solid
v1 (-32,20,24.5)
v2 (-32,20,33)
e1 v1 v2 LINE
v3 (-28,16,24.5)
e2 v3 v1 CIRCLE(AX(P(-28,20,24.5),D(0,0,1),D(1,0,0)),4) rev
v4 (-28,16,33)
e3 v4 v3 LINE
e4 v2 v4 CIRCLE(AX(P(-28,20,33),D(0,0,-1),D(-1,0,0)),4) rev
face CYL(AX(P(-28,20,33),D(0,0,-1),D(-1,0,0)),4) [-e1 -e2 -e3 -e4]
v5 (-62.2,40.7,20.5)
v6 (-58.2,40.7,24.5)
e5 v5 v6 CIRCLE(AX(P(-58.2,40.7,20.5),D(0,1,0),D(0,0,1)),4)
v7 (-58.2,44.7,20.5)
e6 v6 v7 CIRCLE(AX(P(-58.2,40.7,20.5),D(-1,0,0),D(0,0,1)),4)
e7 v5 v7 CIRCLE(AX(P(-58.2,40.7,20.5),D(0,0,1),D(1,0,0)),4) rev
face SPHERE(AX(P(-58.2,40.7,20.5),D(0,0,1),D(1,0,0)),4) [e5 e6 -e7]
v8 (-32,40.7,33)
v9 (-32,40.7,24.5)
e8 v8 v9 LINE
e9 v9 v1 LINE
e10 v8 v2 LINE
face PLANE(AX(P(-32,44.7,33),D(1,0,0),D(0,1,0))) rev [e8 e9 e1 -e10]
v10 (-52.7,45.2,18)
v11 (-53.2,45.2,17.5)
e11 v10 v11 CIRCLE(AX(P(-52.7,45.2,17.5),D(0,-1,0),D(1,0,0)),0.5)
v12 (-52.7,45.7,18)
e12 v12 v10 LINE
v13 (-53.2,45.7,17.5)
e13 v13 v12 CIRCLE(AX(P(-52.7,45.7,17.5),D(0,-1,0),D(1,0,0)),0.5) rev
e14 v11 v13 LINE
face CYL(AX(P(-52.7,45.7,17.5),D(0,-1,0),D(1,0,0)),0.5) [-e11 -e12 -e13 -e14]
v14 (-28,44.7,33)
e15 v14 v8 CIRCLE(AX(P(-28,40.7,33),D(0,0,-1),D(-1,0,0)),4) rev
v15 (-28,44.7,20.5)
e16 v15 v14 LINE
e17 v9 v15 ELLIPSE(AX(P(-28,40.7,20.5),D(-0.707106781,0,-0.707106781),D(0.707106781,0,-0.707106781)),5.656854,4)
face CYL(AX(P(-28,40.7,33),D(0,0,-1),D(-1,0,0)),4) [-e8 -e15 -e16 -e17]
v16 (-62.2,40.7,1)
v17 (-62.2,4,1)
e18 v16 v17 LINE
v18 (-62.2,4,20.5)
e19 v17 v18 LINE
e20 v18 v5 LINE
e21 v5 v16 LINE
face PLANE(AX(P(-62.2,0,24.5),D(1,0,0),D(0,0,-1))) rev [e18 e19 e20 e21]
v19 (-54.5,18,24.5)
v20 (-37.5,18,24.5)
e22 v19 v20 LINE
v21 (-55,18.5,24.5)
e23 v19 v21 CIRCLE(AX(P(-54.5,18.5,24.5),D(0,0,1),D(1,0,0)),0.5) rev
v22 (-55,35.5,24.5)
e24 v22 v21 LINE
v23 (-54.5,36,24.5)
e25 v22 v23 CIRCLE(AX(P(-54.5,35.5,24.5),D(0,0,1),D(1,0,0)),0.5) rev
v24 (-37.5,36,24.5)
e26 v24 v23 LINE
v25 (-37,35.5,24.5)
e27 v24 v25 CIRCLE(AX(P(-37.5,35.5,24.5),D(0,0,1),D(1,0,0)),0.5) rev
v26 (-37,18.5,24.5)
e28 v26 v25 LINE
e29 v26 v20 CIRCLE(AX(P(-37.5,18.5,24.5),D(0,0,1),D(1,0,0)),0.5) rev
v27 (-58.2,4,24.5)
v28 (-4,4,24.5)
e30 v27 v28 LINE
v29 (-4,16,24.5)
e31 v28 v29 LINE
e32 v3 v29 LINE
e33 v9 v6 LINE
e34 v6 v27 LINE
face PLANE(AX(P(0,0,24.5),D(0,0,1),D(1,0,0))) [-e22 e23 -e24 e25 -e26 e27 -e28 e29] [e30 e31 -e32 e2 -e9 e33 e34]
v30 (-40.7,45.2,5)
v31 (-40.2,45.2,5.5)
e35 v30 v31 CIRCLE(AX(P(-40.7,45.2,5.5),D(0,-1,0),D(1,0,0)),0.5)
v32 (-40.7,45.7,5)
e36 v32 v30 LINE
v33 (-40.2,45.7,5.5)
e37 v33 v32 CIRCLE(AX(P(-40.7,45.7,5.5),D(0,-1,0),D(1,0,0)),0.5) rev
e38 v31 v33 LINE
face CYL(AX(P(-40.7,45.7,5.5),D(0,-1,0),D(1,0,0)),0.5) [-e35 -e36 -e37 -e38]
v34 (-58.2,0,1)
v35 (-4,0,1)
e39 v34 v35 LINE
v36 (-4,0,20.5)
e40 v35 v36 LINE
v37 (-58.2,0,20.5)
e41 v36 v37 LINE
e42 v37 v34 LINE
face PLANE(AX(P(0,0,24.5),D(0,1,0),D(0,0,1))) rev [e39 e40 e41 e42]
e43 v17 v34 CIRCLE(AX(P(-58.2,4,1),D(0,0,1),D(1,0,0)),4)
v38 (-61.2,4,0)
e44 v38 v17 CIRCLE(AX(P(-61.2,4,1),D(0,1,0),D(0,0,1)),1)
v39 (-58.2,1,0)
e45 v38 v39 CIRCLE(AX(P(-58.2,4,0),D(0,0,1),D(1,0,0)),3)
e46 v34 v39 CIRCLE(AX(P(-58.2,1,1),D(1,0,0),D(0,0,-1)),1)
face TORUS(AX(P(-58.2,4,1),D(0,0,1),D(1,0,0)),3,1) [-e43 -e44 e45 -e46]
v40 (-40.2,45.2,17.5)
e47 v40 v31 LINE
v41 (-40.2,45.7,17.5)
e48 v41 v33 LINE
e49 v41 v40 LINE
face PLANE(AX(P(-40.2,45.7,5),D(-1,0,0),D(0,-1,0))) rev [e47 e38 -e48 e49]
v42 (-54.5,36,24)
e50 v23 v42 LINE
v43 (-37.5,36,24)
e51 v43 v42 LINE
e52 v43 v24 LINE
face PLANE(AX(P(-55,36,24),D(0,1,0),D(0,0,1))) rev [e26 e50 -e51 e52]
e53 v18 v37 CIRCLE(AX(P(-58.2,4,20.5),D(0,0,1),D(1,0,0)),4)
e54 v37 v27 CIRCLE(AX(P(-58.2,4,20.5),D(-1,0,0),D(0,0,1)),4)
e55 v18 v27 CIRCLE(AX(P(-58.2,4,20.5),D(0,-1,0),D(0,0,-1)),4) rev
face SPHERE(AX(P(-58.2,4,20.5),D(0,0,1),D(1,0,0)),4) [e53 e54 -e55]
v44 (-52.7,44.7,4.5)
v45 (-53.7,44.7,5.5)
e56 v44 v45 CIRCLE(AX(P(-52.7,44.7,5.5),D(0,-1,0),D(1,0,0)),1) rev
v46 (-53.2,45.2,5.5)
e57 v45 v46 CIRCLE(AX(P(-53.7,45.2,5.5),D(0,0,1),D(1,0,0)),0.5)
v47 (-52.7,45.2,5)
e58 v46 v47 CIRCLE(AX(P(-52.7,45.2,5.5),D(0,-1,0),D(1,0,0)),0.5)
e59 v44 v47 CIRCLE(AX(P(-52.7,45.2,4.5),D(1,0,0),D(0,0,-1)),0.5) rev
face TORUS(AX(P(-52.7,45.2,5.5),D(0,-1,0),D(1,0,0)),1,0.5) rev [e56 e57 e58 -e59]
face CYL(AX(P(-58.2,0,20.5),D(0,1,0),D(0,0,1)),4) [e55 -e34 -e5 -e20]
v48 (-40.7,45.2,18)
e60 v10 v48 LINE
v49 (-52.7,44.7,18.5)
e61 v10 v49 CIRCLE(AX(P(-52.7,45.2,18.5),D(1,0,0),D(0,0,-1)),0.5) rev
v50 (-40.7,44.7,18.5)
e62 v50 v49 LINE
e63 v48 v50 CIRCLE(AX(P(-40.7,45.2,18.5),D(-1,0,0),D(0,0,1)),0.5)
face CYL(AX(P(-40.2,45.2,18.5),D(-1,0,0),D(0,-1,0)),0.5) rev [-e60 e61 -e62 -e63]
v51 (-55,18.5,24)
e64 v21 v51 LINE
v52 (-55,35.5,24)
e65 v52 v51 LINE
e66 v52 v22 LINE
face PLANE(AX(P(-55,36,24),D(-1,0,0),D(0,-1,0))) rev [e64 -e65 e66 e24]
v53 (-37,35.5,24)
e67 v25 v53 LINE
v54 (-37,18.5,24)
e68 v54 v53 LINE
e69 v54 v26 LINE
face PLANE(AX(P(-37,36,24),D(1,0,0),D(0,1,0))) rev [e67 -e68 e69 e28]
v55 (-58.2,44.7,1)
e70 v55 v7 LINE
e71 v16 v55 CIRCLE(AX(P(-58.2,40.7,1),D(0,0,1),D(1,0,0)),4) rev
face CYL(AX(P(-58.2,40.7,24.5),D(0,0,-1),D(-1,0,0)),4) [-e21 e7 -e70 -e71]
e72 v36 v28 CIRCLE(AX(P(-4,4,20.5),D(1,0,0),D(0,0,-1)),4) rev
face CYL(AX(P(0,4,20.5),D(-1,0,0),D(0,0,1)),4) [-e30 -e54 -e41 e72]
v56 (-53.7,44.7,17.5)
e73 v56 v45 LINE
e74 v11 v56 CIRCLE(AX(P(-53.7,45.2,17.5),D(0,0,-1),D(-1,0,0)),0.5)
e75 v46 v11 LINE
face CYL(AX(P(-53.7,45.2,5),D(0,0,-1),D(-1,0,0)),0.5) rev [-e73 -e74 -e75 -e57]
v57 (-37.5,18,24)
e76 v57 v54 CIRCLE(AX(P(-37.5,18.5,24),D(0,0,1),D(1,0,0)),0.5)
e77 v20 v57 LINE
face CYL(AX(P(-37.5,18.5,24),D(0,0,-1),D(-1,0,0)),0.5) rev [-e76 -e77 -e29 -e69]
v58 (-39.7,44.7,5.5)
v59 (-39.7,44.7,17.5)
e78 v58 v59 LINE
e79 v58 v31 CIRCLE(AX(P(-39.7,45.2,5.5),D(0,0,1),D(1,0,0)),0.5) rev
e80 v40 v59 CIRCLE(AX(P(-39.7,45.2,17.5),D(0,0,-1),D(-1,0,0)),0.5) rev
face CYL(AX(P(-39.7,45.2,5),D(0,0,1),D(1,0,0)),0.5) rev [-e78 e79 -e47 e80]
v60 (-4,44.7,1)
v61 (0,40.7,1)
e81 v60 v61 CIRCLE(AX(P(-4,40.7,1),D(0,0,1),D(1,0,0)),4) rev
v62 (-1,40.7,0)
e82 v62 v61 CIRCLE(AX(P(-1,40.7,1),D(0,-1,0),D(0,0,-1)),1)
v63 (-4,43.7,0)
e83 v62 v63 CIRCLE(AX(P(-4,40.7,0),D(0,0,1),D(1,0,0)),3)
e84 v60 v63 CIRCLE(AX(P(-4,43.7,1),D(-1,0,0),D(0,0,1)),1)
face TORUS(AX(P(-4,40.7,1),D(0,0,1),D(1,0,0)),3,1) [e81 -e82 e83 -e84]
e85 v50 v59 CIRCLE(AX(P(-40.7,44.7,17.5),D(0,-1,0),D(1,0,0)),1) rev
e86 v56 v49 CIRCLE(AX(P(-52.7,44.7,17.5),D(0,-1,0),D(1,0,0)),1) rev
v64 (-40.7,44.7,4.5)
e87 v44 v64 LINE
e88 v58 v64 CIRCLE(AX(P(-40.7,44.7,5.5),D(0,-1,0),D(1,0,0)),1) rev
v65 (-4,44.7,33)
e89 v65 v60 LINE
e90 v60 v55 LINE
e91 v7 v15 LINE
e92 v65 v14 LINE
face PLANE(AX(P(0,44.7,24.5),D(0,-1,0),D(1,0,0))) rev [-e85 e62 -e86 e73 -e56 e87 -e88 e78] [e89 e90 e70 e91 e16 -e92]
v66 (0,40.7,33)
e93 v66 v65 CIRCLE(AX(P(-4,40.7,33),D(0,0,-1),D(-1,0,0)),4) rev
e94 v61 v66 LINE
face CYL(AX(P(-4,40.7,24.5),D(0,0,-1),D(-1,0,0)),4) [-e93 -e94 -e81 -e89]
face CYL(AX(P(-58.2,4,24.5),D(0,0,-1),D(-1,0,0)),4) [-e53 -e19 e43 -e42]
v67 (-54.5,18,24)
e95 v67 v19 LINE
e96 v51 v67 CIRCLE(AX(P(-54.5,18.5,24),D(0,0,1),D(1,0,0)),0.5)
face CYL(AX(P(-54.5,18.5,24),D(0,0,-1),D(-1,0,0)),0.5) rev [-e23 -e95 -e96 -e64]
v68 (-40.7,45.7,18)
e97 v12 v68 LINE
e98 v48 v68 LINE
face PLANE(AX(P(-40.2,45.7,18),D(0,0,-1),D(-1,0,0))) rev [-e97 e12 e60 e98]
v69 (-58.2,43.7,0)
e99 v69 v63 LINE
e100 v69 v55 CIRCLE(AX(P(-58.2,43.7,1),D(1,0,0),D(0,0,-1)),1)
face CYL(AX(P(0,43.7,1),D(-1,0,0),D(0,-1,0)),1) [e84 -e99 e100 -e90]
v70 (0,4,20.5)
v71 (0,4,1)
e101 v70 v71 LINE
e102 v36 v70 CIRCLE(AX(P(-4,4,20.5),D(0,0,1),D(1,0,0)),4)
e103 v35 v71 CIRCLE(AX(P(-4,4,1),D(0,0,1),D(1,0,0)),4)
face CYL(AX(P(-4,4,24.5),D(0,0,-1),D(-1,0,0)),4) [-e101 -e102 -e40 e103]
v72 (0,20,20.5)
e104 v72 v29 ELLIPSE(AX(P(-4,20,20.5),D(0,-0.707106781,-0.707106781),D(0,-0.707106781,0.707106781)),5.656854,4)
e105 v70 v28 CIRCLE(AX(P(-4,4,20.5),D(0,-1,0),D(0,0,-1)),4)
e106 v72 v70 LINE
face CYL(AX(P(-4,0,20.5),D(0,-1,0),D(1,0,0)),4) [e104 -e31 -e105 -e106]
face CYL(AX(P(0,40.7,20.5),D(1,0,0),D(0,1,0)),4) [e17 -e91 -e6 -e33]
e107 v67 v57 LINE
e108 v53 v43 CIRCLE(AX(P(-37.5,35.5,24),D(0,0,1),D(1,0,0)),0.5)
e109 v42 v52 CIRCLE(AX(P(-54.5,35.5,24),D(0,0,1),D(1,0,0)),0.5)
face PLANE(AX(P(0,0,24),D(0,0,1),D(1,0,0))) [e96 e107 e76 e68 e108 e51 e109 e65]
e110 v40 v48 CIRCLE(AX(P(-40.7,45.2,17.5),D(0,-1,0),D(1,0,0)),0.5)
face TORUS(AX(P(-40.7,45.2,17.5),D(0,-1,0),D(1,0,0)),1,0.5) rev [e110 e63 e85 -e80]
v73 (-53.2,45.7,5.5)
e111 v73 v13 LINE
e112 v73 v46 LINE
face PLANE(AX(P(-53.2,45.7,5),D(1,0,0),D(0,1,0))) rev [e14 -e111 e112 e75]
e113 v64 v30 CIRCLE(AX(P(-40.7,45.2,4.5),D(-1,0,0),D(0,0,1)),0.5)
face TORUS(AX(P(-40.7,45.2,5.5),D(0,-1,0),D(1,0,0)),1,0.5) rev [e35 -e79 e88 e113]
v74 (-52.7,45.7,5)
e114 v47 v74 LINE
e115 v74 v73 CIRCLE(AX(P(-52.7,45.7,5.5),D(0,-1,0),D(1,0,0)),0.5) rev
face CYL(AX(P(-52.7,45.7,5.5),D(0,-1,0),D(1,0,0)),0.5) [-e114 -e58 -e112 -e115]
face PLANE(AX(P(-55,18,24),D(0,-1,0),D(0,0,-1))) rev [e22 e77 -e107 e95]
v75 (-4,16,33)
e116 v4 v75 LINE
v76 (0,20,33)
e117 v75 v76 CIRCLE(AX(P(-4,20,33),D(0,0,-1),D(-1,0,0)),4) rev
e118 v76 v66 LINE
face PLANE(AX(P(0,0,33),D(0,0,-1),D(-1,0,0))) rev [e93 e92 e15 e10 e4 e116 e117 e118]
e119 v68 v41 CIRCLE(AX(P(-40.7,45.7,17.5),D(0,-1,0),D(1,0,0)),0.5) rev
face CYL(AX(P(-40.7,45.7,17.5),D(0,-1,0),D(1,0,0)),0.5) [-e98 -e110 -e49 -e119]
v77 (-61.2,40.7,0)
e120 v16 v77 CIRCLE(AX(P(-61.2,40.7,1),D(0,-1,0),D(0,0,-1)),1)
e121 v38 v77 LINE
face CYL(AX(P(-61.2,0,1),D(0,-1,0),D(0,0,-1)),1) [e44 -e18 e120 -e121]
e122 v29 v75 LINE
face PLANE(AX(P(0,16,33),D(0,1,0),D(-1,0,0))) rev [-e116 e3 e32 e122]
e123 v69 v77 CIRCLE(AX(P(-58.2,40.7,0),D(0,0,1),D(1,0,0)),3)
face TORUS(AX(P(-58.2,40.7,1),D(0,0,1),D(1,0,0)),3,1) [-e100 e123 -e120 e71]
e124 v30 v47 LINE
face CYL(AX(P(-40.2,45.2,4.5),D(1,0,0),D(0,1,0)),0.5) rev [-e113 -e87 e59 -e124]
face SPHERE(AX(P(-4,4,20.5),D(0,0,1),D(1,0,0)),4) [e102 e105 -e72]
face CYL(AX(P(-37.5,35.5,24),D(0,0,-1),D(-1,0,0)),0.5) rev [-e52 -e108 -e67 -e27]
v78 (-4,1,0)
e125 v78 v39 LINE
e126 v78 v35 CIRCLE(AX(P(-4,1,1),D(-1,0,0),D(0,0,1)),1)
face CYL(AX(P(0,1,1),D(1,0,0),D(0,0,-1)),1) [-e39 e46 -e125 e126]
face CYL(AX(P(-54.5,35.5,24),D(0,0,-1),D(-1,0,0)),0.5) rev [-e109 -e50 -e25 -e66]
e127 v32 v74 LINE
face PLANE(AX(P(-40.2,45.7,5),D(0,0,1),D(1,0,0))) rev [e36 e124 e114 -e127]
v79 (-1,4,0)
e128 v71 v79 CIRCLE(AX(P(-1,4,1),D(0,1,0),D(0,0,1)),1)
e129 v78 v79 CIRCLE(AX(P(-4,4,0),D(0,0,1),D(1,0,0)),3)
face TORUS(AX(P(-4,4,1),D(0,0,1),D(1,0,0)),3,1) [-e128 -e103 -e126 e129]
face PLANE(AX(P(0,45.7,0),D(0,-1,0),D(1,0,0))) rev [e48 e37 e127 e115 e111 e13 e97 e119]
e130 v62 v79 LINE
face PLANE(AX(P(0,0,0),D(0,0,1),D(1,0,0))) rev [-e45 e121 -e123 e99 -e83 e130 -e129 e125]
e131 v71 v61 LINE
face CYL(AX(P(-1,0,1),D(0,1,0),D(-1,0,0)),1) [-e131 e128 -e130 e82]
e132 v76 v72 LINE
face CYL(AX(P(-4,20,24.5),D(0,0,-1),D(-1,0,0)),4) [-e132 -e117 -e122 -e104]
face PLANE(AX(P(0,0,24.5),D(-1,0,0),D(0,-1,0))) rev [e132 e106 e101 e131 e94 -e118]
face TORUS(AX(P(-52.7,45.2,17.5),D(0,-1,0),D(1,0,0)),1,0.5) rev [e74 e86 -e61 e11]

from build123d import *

# Parameters (mm, degrees)
CROQUIS1_W              = 62.2
CROQUIS1_H              = 44.7
SALIENTE_EXTRUIR1_DEPTH = 24.5
CROQUIS2_W              = 32
CROQUIS2_H              = 28.7
SALIENTE_EXTRUIR2_DEPTH = 8.5
CROQUIS3_W              = 18
CROQUIS3_H              = 18
CORTAR_EXTRUIR1_DEPTH   = 0.5
CROQUIS4_W              = 13
CROQUIS4_H              = 13
SALIENTE_EXTRUIR3_DEPTH = 1
REDONDEO2_R             = 0.5
REDONDEO3_R             = 1
REDONDEO1_R             = 4


with BuildPart() as part:
    # Croquis1 → Saliente-Extruir1 (new body)
    with BuildSketch(Plane.XY):
        with Locations((-31.1, 22.35)):
            Rectangle(CROQUIS1_W, CROQUIS1_H)
    extrude(amount=SALIENTE_EXTRUIR1_DEPTH)

    # Croquis2 → Saliente-Extruir2 (add)
    with BuildSketch(Plane.XY.offset(24.5)):
        with Locations((-16, 30.35)):
            Rectangle(CROQUIS2_W, CROQUIS2_H)
    extrude(amount=SALIENTE_EXTRUIR2_DEPTH)

    # Croquis3 → Cortar-Extruir1 (cut)
    with BuildSketch(Plane.XY.offset(24.5)):
        with Locations((-46, 27)):
            Rectangle(CROQUIS3_W, CROQUIS3_H)
    extrude(amount=-CORTAR_EXTRUIR1_DEPTH, mode=Mode.SUBTRACT)

    # Croquis4 → Saliente-Extruir3 (add)
    with BuildSketch(Plane(origin=(0, 44.7, 0), x_dir=(1, 0, 0), z_dir=(0, 1, 0))):
        with Locations((-46.7, -11.5)):
            Rectangle(CROQUIS4_W, CROQUIS4_H)
    extrude(amount=SALIENTE_EXTRUIR3_DEPTH)

    # Redondeo2
    redondeo2_edges = [part.edges().sort_by_distance(p)[0] for p in [
        (-55, 18, 24.25),
        (-55, 36, 24.25),
        (-37, 36, 24.25),
        (-37, 18, 24.25),
        (-40.2, 44.7, 11.5),
        (-40.2, 45.2, 18),
        (-46.7, 44.7, 5),
        (-40.2, 45.2, 5),
        (-53.2, 44.7, 11.5),
        (-53.2, 45.2, 5),
        (-46.7, 44.7, 18),
        (-53.2, 45.2, 18),
    ]]
    fillet(redondeo2_edges, radius=REDONDEO2_R)

    # Redondeo3
    redondeo3_edges = [part.edges().sort_by_distance(p)[0] for p in [
        (-31.1, 0, 0),
        (-62.2, 22.35, 0),
        (-31.1, 44.7, 0),
        (0, 22.35, 0),
    ]]
    fillet(redondeo3_edges, radius=REDONDEO3_R)

    # Redondeo1
    # the kernel refuses this fillet: 4 mm, written as the material it takes off along each edge
    with BuildSketch(Plane(origin=(-4, 40.7, 0), x_dir=(0, 1, 0), z_dir=(-1, 0, 0))) as redondeo1_piece_1:
        with BuildLine():
            CenterArc((3, -1), 1, 0, 90)
            Line((4, -1), (4, 0))
            Line((4, 0), (3, 0))
        make_face()
    revolve(axis=Axis((-4, 40.7, 0), (0, 0, -1)), revolution_arc=90, mode=Mode.SUBTRACT)
    with BuildSketch(Plane(origin=(-4, 4, 0), x_dir=(1, 0, 0), z_dir=(0, 1, 0))) as redondeo1_piece_2:
        with BuildLine():
            CenterArc((3, -1), 1, 0, 90)
            Line((4, -1), (4, 0))
            Line((4, 0), (3, 0))
        make_face()
    revolve(axis=Axis((-4, 4, 0), (0, 0, -1)), revolution_arc=90, mode=Mode.SUBTRACT)
    with BuildSketch(Plane(origin=(-58.2, 40.7, 0), x_dir=(-1, 0, 0), z_dir=(0, -1, 0))) as redondeo1_piece_3:
        with BuildLine():
            CenterArc((3, -1), 1, 0, 90)
            Line((4, -1), (4, 0))
            Line((4, 0), (3, 0))
        make_face()
    revolve(axis=Axis((-58.2, 40.7, 0), (0, 0, -1)), revolution_arc=90, mode=Mode.SUBTRACT)
    with BuildSketch(Plane(origin=(-58.2, 4, 0), x_dir=(0, -1, 0), z_dir=(1, 0, 0))) as redondeo1_piece_4:
        with BuildLine():
            CenterArc((3, -1), 1, 0, 90)
            Line((4, -1), (4, 0))
            Line((4, 0), (3, 0))
        make_face()
    revolve(axis=Axis((-58.2, 4, 0), (0, 0, -1)), revolution_arc=90, mode=Mode.SUBTRACT)
    with BuildSketch(Plane(origin=(-58.2, 4, 20.5), x_dir=(0, 0, 1), z_dir=(0, -1, 0))) as redondeo1_piece_5_section:
        Polygon((0, 0), (REDONDEO1_R, 0), (REDONDEO1_R, REDONDEO1_R), (0, REDONDEO1_R), align=None)
    redondeo1_piece_5 = extrude(amount=REDONDEO1_R, mode=Mode.PRIVATE)
    redondeo1_piece_5 = redondeo1_piece_5 - Plane(origin=(-58.2, 4, 20.5), x_dir=(0.7071067811865475, 0, -0.7071067811865475), z_dir=(0, -1, 0)) * Sphere(REDONDEO1_R, mode=Mode.PRIVATE)
    add(redondeo1_piece_5, mode=Mode.SUBTRACT)
    with BuildSketch(Plane(origin=(-58.2, 40.7, 20.5), x_dir=(0, 0, 1), z_dir=(0, 1, 0))) as redondeo1_piece_6_section:
        Polygon((0, 0), (REDONDEO1_R, 0), (REDONDEO1_R, -REDONDEO1_R), (0, -REDONDEO1_R), align=None)
    redondeo1_piece_6 = extrude(amount=REDONDEO1_R, mode=Mode.PRIVATE)
    redondeo1_piece_6 = redondeo1_piece_6 - Plane(origin=(-58.2, 40.7, 20.5), x_dir=(0.7071067811865475, 0, -0.7071067811865475), z_dir=(0, 1, 0)) * Sphere(REDONDEO1_R, mode=Mode.PRIVATE)
    add(redondeo1_piece_6, mode=Mode.SUBTRACT)
    with BuildSketch(Plane(origin=(-4, 4, 20.5), x_dir=(0, -1, 0), z_dir=(1, 0, 0))) as redondeo1_piece_7_section:
        Polygon((0, 0), (REDONDEO1_R, 0), (REDONDEO1_R, -REDONDEO1_R), (0, -REDONDEO1_R), align=None)
    redondeo1_piece_7 = extrude(amount=REDONDEO1_R, mode=Mode.PRIVATE)
    redondeo1_piece_7 = redondeo1_piece_7 - Plane(origin=(-4, 4, 20.5), x_dir=(0, 0.7071067811865475, -0.7071067811865475), z_dir=(1, 0, 0)) * Sphere(REDONDEO1_R, mode=Mode.PRIVATE)
    add(redondeo1_piece_7, mode=Mode.SUBTRACT)
    with BuildSketch(Plane(origin=(-62.2, 4, 24.5), x_dir=(1, 0, 0), z_dir=(0, 1, 0))) as redondeo1_piece_8:
        with BuildLine():
            CenterArc((REDONDEO1_R, REDONDEO1_R), REDONDEO1_R, 180, 90)
            Line((0, REDONDEO1_R), (0, 0))
            Line((0, 0), (REDONDEO1_R, 0))
        make_face()
    extrude(amount=36.7, mode=Mode.SUBTRACT)
    with BuildSketch(Plane(origin=(-4, 0, 24.5), x_dir=(0, 0, -1), z_dir=(-1, 0, 0))) as redondeo1_piece_9:
        with BuildLine():
            CenterArc((REDONDEO1_R, -REDONDEO1_R), REDONDEO1_R, 90, 90)
            Line((0, -REDONDEO1_R), (0, 0))
            Line((0, 0), (REDONDEO1_R, 0))
        make_face()
    extrude(amount=54.2, mode=Mode.SUBTRACT)
    with BuildSketch(Plane(origin=(-58.2, 44.7, 24.5), x_dir=(0, 0, -1), z_dir=(1, 0, 0))) as redondeo1_piece_10:
        with BuildLine():
            CenterArc((REDONDEO1_R, -REDONDEO1_R), REDONDEO1_R, 90, 90)
            Line((0, -REDONDEO1_R), (0, 0))
            Line((0, 0), (REDONDEO1_R, 0))
        make_face()
    extrude(amount=26.2, mode=Mode.SUBTRACT)
    with BuildSketch(Plane(origin=(0, 16, 24.5), x_dir=(0, 1, 0), z_dir=(0, 0, 1)), Plane(origin=(-32, 16, 24.5), x_dir=(1, 0, 0), z_dir=(0, 0, 1))) as redondeo1_piece_11:
        with BuildLine():
            CenterArc((REDONDEO1_R, REDONDEO1_R), REDONDEO1_R, 180, 90)
            Line((0, REDONDEO1_R), (0, 0))
            Line((0, 0), (REDONDEO1_R, 0))
        make_face()
    extrude(amount=18.5, mode=Mode.SUBTRACT)
    with BuildSketch(Plane(origin=(-32, 44.7, 24.5), x_dir=(1, 0, 0), z_dir=(0, 0, 1))) as redondeo1_piece_12:
        with BuildLine():
            CenterArc((REDONDEO1_R, -REDONDEO1_R), REDONDEO1_R, 90, 90)
            Line((0, -REDONDEO1_R), (0, 0))
            Line((0, 0), (REDONDEO1_R, 0))
        make_face()
    extrude(amount=18.5, mode=Mode.SUBTRACT)
    with BuildSketch(Plane(origin=(0, 16, 24.5), x_dir=(0, 0, -1), z_dir=(0, -1, 0))) as redondeo1_piece_13:
        with BuildLine():
            CenterArc((REDONDEO1_R, -REDONDEO1_R), REDONDEO1_R, 90, 90)
            Line((0, -REDONDEO1_R), (0, 0))
            Line((0, 0), (REDONDEO1_R, 0))
        make_face()
    extrude(amount=12, mode=Mode.SUBTRACT)
    with BuildSketch(Plane(origin=(0, 0, 0), x_dir=(0, 1, 0), z_dir=(0, 0, 1)), Plane(origin=(-62.2, 0, 0), x_dir=(1, 0, 0), z_dir=(0, 0, 1))) as redondeo1_piece_14:
        with BuildLine():
            CenterArc((REDONDEO1_R, REDONDEO1_R), REDONDEO1_R, 180, 90)
            Line((0, REDONDEO1_R), (0, 0))
            Line((0, 0), (REDONDEO1_R, 0))
        make_face()
    extrude(amount=20.5, mode=Mode.SUBTRACT)
    with BuildSketch(Plane(origin=(-62.2, 44.7, 0), x_dir=(1, 0, 0), z_dir=(0, 0, 1))) as redondeo1_piece_15:
        with BuildLine():
            CenterArc((REDONDEO1_R, -REDONDEO1_R), REDONDEO1_R, 90, 90)
            Line((0, -REDONDEO1_R), (0, 0))
            Line((0, 0), (REDONDEO1_R, 0))
        make_face()
    extrude(amount=20.5, mode=Mode.SUBTRACT)
    with BuildSketch(Plane(origin=(0, 44.7, 0), x_dir=(0, -1, 0), z_dir=(0, 0, 1))) as redondeo1_piece_16:
        with BuildLine():
            CenterArc((REDONDEO1_R, -REDONDEO1_R), REDONDEO1_R, 90, 90)
            Line((0, -REDONDEO1_R), (0, 0))
            Line((0, 0), (REDONDEO1_R, 0))
        make_face()
    extrude(amount=43, mode=Mode.SUBTRACT)
    with BuildSketch(Plane(origin=(-58.2, 44.7, 24.5), x_dir=(0, 0, -1), z_dir=(1, 0, 0))) as redondeo1_piece_17a_section:
        with BuildLine():
            CenterArc((REDONDEO1_R, -REDONDEO1_R), REDONDEO1_R, 90, 90)
            Line((0, -REDONDEO1_R), (0, 0))
            Line((0, 0), (REDONDEO1_R, 0))
        make_face()
    redondeo1_piece_17a = extrude(amount=36.2, mode=Mode.PRIVATE)
    redondeo1_piece_17a = split(redondeo1_piece_17a, bisect_by=Plane(origin=(-32, 43.794419543, 23.594419543), z_dir=(1, 0, 0)), keep=Keep.TOP, mode=Mode.PRIVATE)
    with BuildSketch(Plane(origin=(-32, 44.7, 14.5), x_dir=(1, 0, 0), z_dir=(0, 0, 1))) as redondeo1_piece_17b_section:
        with BuildLine():
            CenterArc((REDONDEO1_R, -REDONDEO1_R), REDONDEO1_R, 90, 90)
            Line((0, -REDONDEO1_R), (0, 0))
            Line((0, 0), (REDONDEO1_R, 0))
        make_face()
    redondeo1_piece_17b = extrude(amount=28.5, mode=Mode.PRIVATE)
    redondeo1_piece_17b = split(redondeo1_piece_17b, bisect_by=Plane(origin=(-31.094419543, 43.794419543, 24.5), z_dir=(0, 0, -1)), keep=Keep.TOP, mode=Mode.PRIVATE)
    redondeo1_piece_17 = redondeo1_piece_17a & redondeo1_piece_17b
    add(redondeo1_piece_17, mode=Mode.SUBTRACT)
    with BuildSketch(Plane(origin=(0, 16, 14.5), x_dir=(0, 1, 0), z_dir=(0, 0, 1))) as redondeo1_piece_18a_section:
        with BuildLine():
            CenterArc((REDONDEO1_R, REDONDEO1_R), REDONDEO1_R, 180, 90)
            Line((0, REDONDEO1_R), (0, 0))
            Line((0, 0), (REDONDEO1_R, 0))
        make_face()
    redondeo1_piece_18a = extrude(amount=28.5, mode=Mode.PRIVATE)
    redondeo1_piece_18a = split(redondeo1_piece_18a, bisect_by=Plane(origin=(-0.905580457, 16.905580457, 24.5), z_dir=(0, 0, -1)), keep=Keep.TOP, mode=Mode.PRIVATE)
    with BuildSketch(Plane(origin=(0, 26, 24.5), x_dir=(0, 0, -1), z_dir=(0, -1, 0))) as redondeo1_piece_18b_section:
        with BuildLine():
            CenterArc((REDONDEO1_R, -REDONDEO1_R), REDONDEO1_R, 90, 90)
            Line((0, -REDONDEO1_R), (0, 0))
            Line((0, 0), (REDONDEO1_R, 0))
        make_face()
    redondeo1_piece_18b = extrude(amount=22, mode=Mode.PRIVATE)
    redondeo1_piece_18b = split(redondeo1_piece_18b, bisect_by=Plane(origin=(-0.905580457, 16, 23.594419543), z_dir=(0, 1, 0)), keep=Keep.TOP, mode=Mode.PRIVATE)
    redondeo1_piece_18 = redondeo1_piece_18a & redondeo1_piece_18b
    add(redondeo1_piece_18, mode=Mode.SUBTRACT)


solid = part.part
